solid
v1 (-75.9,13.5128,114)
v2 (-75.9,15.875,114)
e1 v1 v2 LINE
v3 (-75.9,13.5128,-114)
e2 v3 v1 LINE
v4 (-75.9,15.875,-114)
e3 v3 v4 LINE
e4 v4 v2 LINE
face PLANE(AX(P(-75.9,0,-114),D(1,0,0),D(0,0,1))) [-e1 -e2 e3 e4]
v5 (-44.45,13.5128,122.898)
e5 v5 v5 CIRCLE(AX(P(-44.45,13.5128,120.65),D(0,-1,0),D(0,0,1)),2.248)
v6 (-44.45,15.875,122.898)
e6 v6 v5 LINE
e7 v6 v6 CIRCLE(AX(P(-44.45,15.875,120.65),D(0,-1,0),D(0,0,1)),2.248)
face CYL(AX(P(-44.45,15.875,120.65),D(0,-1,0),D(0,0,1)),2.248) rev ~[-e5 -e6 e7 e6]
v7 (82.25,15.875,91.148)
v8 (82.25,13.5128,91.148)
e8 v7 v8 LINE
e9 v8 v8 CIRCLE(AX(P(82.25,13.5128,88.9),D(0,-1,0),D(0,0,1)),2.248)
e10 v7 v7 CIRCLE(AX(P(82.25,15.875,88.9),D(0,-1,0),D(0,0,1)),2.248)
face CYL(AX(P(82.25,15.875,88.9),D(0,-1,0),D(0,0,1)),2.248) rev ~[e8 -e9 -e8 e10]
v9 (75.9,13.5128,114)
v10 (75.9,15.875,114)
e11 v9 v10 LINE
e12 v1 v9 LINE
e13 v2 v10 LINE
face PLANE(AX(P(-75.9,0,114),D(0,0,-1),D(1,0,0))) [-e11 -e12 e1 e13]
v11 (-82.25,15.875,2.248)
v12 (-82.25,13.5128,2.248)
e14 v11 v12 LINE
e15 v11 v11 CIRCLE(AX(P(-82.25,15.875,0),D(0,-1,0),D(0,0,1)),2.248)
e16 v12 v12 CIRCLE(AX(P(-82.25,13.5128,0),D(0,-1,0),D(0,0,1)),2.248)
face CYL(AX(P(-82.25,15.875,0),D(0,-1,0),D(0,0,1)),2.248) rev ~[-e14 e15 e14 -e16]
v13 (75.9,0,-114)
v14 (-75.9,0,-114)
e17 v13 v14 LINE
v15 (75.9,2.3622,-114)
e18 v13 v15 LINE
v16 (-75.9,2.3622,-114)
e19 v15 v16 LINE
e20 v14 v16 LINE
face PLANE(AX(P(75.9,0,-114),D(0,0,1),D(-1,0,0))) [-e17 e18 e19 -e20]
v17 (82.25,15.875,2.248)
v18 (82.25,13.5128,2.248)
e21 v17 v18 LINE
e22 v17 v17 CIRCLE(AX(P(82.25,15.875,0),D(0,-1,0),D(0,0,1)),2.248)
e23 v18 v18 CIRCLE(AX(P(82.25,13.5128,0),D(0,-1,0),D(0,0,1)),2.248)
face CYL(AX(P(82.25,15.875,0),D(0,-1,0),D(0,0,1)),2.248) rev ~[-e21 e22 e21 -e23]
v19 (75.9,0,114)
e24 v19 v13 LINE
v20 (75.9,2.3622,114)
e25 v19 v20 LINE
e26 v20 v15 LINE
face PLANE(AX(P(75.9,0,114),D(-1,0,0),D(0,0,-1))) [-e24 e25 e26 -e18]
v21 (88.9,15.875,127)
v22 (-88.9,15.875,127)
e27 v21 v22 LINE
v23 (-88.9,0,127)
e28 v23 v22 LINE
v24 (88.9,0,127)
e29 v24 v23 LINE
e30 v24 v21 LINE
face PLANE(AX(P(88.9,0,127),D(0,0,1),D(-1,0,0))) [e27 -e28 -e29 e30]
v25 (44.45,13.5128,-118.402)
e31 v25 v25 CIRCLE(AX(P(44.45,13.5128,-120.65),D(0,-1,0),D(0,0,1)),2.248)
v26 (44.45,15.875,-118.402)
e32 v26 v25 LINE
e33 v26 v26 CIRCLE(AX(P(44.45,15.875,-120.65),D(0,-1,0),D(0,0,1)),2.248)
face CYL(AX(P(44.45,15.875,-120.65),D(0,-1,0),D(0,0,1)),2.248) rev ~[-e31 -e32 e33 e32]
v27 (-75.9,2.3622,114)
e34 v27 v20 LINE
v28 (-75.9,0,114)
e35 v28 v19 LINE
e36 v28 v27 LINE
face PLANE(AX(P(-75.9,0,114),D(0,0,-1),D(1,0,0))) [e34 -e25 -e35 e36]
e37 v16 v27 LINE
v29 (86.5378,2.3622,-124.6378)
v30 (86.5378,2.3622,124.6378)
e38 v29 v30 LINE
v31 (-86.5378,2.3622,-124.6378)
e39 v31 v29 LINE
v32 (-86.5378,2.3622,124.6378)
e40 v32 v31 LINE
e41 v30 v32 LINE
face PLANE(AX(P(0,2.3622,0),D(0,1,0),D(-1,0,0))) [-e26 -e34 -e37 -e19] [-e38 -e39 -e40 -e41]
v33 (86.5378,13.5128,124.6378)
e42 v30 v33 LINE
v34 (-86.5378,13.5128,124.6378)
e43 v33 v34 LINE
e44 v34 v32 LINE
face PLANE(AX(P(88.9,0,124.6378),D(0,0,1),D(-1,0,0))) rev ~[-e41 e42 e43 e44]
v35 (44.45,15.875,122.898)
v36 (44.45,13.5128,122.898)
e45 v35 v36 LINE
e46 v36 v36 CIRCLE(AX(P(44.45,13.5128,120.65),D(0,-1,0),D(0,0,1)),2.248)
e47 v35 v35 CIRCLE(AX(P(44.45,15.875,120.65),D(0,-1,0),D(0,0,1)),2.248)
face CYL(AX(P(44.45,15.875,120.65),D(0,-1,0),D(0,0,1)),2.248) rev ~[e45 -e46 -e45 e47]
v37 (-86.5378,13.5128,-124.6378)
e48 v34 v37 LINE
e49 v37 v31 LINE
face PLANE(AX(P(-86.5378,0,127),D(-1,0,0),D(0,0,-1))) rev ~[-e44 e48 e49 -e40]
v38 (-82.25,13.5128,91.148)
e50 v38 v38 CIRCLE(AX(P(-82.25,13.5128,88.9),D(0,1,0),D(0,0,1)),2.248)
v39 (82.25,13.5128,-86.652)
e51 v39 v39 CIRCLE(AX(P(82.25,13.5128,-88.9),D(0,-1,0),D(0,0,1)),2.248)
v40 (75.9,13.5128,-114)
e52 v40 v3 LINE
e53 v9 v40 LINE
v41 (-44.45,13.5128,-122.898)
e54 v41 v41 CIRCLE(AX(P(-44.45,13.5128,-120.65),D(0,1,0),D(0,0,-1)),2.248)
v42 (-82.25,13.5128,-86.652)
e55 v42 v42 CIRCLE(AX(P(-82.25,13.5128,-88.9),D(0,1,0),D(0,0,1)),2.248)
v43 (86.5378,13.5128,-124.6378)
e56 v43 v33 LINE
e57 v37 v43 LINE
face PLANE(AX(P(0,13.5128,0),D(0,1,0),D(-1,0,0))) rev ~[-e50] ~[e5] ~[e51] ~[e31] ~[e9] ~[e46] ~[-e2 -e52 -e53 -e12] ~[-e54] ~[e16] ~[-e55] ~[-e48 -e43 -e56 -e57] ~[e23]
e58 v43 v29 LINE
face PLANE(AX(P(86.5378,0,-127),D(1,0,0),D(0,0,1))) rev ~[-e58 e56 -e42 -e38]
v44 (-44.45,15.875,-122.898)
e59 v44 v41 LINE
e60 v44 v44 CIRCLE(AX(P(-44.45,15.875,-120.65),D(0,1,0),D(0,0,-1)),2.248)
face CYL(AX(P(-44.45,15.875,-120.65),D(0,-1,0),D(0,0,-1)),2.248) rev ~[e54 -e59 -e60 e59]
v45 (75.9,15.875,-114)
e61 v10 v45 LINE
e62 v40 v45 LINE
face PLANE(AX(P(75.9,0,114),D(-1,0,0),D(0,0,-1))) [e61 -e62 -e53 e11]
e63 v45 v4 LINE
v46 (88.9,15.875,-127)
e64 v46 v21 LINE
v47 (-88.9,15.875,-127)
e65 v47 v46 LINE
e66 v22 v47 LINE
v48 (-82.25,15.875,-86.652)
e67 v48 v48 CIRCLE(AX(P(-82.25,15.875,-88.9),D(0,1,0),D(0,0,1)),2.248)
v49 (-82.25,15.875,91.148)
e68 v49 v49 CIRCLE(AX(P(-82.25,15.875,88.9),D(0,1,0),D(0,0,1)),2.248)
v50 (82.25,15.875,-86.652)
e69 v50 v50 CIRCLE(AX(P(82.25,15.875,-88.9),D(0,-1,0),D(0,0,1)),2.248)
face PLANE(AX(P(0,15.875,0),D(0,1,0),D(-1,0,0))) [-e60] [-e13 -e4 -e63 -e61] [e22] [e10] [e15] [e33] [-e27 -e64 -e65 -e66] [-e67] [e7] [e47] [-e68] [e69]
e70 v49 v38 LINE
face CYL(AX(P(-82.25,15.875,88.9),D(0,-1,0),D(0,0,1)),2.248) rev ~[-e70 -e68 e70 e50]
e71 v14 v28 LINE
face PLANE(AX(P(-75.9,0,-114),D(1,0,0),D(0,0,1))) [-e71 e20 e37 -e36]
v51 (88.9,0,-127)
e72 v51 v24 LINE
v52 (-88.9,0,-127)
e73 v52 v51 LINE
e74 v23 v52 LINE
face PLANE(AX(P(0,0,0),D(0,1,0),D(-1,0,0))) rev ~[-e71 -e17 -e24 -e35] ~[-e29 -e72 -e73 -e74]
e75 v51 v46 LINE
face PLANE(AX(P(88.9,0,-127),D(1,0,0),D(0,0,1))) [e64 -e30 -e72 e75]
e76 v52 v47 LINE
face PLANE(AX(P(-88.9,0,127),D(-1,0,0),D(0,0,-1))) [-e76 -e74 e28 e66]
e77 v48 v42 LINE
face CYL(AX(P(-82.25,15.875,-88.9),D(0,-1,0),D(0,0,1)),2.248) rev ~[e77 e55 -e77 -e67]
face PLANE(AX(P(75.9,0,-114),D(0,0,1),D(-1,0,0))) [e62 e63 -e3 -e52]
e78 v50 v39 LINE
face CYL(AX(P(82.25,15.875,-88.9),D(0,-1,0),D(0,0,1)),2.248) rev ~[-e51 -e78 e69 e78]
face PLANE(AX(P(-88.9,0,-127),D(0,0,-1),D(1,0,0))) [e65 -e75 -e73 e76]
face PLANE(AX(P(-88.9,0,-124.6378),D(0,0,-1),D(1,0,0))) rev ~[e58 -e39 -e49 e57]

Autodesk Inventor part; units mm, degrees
ref_plane "YZ Plane" through (0, 0, 0) normal (1, 0, 0) x (0, 1, 0)
ref_plane "XZ Plane" through (0, 0, 0) normal (0, 1, 0) x (-1, 0, 0)
ref_plane "XY Plane" through (0, 0, 0) normal (0, 0, 1) x (1, 0, 0)
sketch "Sketch1" plane through (0, 0, 0) normal (0, 1, 0) x (-1, 0, 0)
  line L0 (-88.9, 127) -> (88.9, 127)
  line L1 (88.9, 127) -> (88.9, -127)
  line L2 (88.9, -127) -> (-88.9, -127)
  line L3 (-88.9, -127) -> (-88.9, 127)
  line L4 (-88.9, 127) -> (88.9, -127) construction
  line L5 (88.9, 127) -> (-88.9, -127) construction
  line L6 (75.9, 114) -> (-75.9, 114)
  line L7 (-75.9, 114) -> (-75.9, -114)
  line L8 (-75.9, -114) -> (75.9, -114)
  line L9 (75.9, -114) -> (75.9, 114)
  point P0 (0, 0)
  dimension "d1" = 254
  dimension "d2" = 177.8
  dimension "d3" = 13
extrude "Extrusion1" add sketch "Sketch1" along normal blind 15.875
shell "Shell1" thickness 2.3622 removed faces 4 at (-75.9, 5.2917, -38) at (25.3, 5.2917, -114) at (75.9, 5.2917, 38) at (-25.3, 5.2917, 114)
hole "Hole1" at (82.25, 15.875, 0) direction (0, -1, 0) diameter 4.496 end up to surface clearance for "Flat Head Machine Screw (82)" size "#8" standard "Ansi Unified Screw Threads"
pattern_linear "Rectangular Pattern1" count 3 spacing 88.9 along (0, 0, 1) of "Hole1" first direction both ways yes
mirror "Mirror1" about plane through (0, 0, 0) normal (1, 0, 0) of "Hole1", "Rectangular Pattern1"
hole "Hole2" at (44.45, 15.875, 120.65) direction (0, -1, 0) diameter 4.496 end up to surface clearance for "Flat Head Machine Screw (82)" size "#8" standard "Ansi Unified Screw Threads"
mirror "Mirror2" about plane through (0, 0, 0) normal (1, 0, 0) of "Hole2"
mirror "Mirror3" about plane through (0, 0, 0) normal (0, 0, 1) of "Hole2", "Mirror2"
properties part number "honeyCombFrame"
